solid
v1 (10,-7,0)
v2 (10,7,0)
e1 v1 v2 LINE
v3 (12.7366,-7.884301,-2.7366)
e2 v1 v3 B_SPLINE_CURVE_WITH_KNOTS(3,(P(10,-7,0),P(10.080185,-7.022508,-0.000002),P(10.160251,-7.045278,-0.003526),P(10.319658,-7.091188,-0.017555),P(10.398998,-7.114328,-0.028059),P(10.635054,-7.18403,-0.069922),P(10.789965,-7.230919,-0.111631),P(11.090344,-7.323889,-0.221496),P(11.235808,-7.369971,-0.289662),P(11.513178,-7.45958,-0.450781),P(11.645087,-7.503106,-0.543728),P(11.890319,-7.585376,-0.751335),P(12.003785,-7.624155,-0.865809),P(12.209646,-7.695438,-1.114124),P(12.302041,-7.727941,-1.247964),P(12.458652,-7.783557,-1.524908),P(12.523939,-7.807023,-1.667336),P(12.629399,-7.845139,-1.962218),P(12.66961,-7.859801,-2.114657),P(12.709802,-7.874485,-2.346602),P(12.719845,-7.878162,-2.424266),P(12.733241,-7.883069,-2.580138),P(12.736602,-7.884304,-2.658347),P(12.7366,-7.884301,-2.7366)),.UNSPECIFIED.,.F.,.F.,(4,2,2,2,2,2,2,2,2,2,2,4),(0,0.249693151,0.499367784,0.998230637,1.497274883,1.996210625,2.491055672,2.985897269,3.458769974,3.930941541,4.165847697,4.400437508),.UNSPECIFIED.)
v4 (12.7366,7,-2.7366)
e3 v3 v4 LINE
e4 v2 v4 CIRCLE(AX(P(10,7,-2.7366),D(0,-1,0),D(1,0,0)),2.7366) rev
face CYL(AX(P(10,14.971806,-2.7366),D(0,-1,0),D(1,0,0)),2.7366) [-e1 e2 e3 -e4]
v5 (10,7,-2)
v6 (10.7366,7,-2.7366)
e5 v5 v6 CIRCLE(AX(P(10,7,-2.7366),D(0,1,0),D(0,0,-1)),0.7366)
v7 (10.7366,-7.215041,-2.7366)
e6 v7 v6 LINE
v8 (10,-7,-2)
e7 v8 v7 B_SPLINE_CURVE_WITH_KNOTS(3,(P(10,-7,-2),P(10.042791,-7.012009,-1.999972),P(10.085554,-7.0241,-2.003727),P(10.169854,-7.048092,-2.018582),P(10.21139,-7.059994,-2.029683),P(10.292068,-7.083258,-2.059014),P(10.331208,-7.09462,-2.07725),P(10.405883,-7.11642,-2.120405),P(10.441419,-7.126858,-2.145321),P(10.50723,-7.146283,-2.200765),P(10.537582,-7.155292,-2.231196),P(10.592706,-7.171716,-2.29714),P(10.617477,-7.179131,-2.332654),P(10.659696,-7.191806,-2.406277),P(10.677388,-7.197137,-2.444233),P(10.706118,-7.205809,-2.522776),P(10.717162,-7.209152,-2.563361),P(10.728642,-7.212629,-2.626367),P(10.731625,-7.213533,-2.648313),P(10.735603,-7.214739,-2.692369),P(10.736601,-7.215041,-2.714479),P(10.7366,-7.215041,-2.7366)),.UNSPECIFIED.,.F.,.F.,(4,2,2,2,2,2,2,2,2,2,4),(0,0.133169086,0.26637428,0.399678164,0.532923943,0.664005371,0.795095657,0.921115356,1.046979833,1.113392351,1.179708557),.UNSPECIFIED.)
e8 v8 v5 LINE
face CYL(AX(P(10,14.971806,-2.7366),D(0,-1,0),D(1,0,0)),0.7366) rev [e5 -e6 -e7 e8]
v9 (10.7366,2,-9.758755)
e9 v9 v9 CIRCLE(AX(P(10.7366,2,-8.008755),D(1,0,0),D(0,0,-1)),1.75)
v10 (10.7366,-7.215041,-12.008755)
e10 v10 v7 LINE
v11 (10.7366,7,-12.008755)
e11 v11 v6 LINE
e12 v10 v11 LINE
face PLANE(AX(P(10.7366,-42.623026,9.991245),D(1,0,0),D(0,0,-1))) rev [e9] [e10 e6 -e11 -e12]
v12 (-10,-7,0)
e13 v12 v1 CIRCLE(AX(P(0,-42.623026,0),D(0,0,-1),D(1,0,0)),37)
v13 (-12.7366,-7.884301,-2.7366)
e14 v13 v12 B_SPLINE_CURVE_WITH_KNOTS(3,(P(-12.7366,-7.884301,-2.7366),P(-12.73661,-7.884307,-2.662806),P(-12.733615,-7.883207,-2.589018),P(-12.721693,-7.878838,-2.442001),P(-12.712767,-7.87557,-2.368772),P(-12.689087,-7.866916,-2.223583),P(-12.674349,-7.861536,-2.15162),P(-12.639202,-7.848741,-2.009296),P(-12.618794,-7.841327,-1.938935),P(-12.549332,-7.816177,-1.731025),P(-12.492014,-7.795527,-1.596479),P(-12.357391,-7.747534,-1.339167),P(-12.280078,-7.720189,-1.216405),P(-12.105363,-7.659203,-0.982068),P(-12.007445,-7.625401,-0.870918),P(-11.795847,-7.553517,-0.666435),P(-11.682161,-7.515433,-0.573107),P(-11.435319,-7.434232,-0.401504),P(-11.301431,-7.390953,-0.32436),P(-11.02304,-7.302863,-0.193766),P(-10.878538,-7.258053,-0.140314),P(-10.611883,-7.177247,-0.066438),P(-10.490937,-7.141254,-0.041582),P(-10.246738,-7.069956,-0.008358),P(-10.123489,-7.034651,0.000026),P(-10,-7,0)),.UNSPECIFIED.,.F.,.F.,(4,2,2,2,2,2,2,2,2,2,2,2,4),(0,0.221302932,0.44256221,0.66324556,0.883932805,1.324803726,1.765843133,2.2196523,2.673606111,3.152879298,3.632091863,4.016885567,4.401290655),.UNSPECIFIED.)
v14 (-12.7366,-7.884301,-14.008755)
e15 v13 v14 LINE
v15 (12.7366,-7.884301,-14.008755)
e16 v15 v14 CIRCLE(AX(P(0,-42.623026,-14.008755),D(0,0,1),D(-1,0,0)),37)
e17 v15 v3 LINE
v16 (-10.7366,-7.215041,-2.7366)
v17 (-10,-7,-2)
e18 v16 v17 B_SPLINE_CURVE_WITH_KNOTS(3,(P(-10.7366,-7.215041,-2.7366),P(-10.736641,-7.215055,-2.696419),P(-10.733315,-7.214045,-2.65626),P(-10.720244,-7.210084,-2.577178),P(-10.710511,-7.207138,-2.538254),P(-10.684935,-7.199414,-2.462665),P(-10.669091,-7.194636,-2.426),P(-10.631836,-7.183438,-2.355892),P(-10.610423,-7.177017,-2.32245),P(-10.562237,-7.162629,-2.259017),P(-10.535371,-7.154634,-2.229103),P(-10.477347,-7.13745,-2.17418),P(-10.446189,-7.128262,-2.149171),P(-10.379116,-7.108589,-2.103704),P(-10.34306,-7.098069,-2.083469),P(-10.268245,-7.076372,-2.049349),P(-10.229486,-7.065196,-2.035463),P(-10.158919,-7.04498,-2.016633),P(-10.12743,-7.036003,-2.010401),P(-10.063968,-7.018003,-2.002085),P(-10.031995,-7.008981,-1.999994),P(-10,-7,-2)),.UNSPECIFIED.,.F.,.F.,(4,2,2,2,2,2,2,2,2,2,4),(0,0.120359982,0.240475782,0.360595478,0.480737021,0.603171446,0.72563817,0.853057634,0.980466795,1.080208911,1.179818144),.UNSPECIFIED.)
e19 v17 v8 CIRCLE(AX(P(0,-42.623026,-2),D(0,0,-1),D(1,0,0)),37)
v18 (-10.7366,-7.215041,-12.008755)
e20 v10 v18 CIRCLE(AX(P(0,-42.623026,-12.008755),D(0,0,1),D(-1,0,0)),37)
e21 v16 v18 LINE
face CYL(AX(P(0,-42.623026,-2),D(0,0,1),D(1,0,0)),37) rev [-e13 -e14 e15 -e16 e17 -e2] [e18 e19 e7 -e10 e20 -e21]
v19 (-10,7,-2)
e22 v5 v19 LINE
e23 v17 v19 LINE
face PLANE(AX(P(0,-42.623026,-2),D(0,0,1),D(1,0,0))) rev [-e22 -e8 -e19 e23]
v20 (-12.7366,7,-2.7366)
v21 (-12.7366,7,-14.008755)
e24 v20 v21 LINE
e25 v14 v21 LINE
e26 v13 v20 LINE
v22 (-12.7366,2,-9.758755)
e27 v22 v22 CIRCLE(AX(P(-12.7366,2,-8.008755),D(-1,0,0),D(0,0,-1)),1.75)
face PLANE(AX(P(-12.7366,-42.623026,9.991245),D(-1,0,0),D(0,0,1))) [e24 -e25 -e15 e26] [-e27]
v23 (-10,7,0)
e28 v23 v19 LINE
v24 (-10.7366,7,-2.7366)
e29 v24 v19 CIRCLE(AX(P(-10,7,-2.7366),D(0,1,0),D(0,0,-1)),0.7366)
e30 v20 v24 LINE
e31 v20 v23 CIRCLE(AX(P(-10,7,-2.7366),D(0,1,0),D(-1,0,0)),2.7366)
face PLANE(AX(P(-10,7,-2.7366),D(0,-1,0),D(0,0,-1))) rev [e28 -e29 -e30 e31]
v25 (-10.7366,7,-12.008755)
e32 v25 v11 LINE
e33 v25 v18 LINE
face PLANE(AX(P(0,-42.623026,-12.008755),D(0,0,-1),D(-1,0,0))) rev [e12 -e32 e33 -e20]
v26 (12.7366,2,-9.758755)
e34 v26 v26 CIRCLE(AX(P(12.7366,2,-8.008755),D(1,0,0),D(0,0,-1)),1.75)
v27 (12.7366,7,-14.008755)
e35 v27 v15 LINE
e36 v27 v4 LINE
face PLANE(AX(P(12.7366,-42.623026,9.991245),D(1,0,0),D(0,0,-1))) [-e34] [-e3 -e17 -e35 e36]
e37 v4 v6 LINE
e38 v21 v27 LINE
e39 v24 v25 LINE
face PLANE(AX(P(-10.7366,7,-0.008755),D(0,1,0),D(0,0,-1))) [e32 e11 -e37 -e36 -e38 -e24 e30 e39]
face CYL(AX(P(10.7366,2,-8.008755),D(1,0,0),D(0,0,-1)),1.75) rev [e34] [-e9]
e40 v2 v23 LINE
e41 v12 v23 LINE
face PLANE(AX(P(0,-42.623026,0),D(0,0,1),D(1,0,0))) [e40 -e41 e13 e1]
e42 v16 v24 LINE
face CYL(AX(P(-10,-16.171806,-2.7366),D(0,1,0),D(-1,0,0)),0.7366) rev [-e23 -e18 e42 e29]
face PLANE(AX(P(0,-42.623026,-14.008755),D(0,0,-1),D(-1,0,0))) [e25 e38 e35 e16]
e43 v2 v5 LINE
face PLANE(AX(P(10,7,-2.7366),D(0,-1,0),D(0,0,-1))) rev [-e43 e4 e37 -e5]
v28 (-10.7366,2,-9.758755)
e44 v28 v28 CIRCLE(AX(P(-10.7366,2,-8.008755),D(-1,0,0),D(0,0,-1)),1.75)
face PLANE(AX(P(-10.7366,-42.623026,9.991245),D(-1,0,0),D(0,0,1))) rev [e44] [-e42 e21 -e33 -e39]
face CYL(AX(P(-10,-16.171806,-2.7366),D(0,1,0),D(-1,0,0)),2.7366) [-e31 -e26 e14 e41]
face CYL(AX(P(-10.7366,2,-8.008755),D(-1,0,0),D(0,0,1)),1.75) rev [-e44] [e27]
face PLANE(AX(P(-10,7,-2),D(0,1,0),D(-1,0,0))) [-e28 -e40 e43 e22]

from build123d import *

# Parameters (mm, degrees)
SKETCH1_R                  = 1.75
BASE_FLANGE1_DEPTH         = 2
SKETCHED_START             = -8.2
SKETCHED_BEND1_DEPTH       = 15.2
SKETCHED_BEND1_2_DEPTH     = 8.4499999
SKETCHED_START_2           = 3.7500001
SKETCHED_BEND1_3_DEPTH     = 3.2499999
SKETCHED_START_3           = 0.2499999
SKETCHED_BEND1_4_DEPTH     = 3.5000002
SKETCHED_START_4           = -12.7366
SKETCHED_BEND1_5_OUTLINE_R = 1.75
SKETCHED_BEND1_5_DEPTH     = 25.4732
SKETCH7_R                  = 37
CUT_EXTRUDE1_DEPTH         = 20.330576261
BOSS_EXTRUDE1_DEPTH        = 2


with BuildPart() as part:
    # Base-Flange1: sheet metal written as solids
    # Sketch1 → Base-Flange1 (new body)
    with BuildSketch(Plane.XY):
        with BuildLine():
            Line((10, 7), (22, 7))
            Line((22, 7), (22, -8.2))
            Line((22, -8.2), (10, -8.2))
            Line((10, -8.2), (10, -7))
            ThreePointArc((10, -7), (0, -5.623026261), (-10, -7))
            Line((-10, -7), (-10, -8.2))
            Line((-10, -8.2), (-22, -8.2))
            Line((-22, -8.2), (-22, 7))
            Line((-22, 7), (-10, 7))
            Line((-10, 7), (10, 7))
        make_face()
        with Locations((18, 2)):
            Circle(SKETCH1_R, mode=Mode.SUBTRACT)
        with Locations(Location((-18, 2, 0), (0, 0, 180))):
            Circle(SKETCH1_R, mode=Mode.SUBTRACT)
    extrude(amount=-BASE_FLANGE1_DEPTH)

    # Sketched Bend1: read off the stored shape, not the designer's step
    # Sketched Bend1 outline → Sketched Bend1 (cut)
    with BuildSketch(Plane(origin=(0, 0, 0), x_dir=(1, 0, 0), z_dir=(0, 1, 0)).offset(SKETCHED_START)):
        with BuildLine():
            ThreePointArc((-10, 0), (-11.654267209, 0.556604688), (-12.635602398, 2))
            Line((-12.635602398, 2), (-22, 2))
            Line((-22, 2), (-22, 0))
            Line((-22, 0), (-10, 0))
        make_face()
        with BuildLine():
            Line((22, 2), (12.635602398, 2))
            ThreePointArc((12.635602398, 2), (11.654267209, 0.556604688), (10, 0))
            Line((10, 0), (22, 0))
            Line((22, 0), (22, 2))
        make_face()
    extrude(amount=SKETCHED_BEND1_DEPTH, mode=Mode.SUBTRACT)

    # Sketched Bend1 2 outline → Sketched Bend1 2 (add)
    with BuildSketch(Plane(origin=(0, 0, 0), x_dir=(1, 0, 0), z_dir=(0, 1, 0)).offset(SKETCHED_START)):
        with BuildLine():
            ThreePointArc((-10, 2), (-10.520854855, 2.215745145), (-10.7366, 2.7366))
            Line((-10.7366, 2.7366), (-10.7366, 12.008755099))
            Line((-10.7366, 12.008755099), (-12.7366, 12.008755099))
            Line((-12.7366, 12.008755099), (-12.7366, 2.7366))
            ThreePointArc((-12.7366, 2.7366), (-12.711233029, 2.364854094), (-12.635602398, 2))
            Line((-12.635602398, 2), (-10, 2))
        make_face()
        with BuildLine():
            ThreePointArc((10.7366, 2.7366), (10.520854855, 2.215745145), (10, 2))
            Line((10, 2), (12.635602398, 2))
            ThreePointArc((12.635602398, 2), (12.711233029, 2.364854094), (12.7366, 2.7366))
            Line((12.7366, 2.7366), (12.7366, 12.008755099))
            Line((12.7366, 12.008755099), (10.7366, 12.008755099))
            Line((10.7366, 12.008755099), (10.7366, 2.7366))
        make_face()
    extrude(amount=SKETCHED_BEND1_2_DEPTH)

    # Sketched Bend1 3 outline → Sketched Bend1 3 (add)
    with BuildSketch(Plane(origin=(0, 0, 0), x_dir=(1, 0, 0), z_dir=(0, 1, 0)).offset(SKETCHED_START_2)):
        with BuildLine():
            ThreePointArc((-10, 2), (-10.520854855, 2.215745145), (-10.7366, 2.7366))
            Line((-10.7366, 2.7366), (-10.7366, 12.008755099))
            Line((-10.7366, 12.008755099), (-12.7366, 12.008755099))
            Line((-12.7366, 12.008755099), (-12.7366, 2.7366))
            ThreePointArc((-12.7366, 2.7366), (-12.711233029, 2.364854094), (-12.635602398, 2))
            Line((-12.635602398, 2), (-10, 2))
        make_face()
        with BuildLine():
            ThreePointArc((10.7366, 2.7366), (10.520854855, 2.215745145), (10, 2))
            Line((10, 2), (12.635602398, 2))
            ThreePointArc((12.635602398, 2), (12.711233029, 2.364854094), (12.7366, 2.7366))
            Line((12.7366, 2.7366), (12.7366, 12.008755099))
            Line((12.7366, 12.008755099), (10.7366, 12.008755099))
            Line((10.7366, 12.008755099), (10.7366, 2.7366))
        make_face()
    extrude(amount=SKETCHED_BEND1_3_DEPTH)

    # Sketched Bend1 4 outline → Sketched Bend1 4 (add)
    with BuildSketch(Plane(origin=(0, 0, 0), x_dir=(1, 0, 0), z_dir=(0, 1, 0)).offset(SKETCHED_START_3)):
        with BuildLine():
            ThreePointArc((10.7366, 2.7366), (10.520854855, 2.215745145), (10, 2))
            Line((10, 2), (12.635602398, 2))
            ThreePointArc((12.635602398, 2), (12.711233029, 2.364854094), (12.7366, 2.7366))
            Line((12.7366, 2.7366), (12.7366, 12.008755099))
            Line((12.7366, 12.008755099), (10.7366, 12.008755099))
            Line((10.7366, 12.008755099), (10.7366, 2.7366))
        make_face()
        with BuildLine():
            ThreePointArc((-10, 2), (-10.520854855, 2.215745145), (-10.7366, 2.7366))
            Line((-10.7366, 2.7366), (-10.7366, 12.008755099))
            Line((-10.7366, 12.008755099), (-12.7366, 12.008755099))
            Line((-12.7366, 12.008755099), (-12.7366, 2.7366))
            ThreePointArc((-12.7366, 2.7366), (-12.711233029, 2.364854094), (-12.635602398, 2))
            Line((-12.635602398, 2), (-10, 2))
        make_face()
    extrude(amount=SKETCHED_BEND1_4_DEPTH)

    # Sketched Bend1 5 outline → Sketched Bend1 5 (cut)
    with BuildSketch(Plane.YZ.offset(SKETCHED_START_4)):
        with Locations((2, -8.008755099)):
            Circle(SKETCHED_BEND1_5_OUTLINE_R)
    extrude(amount=SKETCHED_BEND1_5_DEPTH, mode=Mode.SUBTRACT)

    # Sketch7 → Cut-Extrude1 (cut, through all)
    with BuildSketch(Plane.XY):
        with Locations((0, -42.623026261)):
            Circle(SKETCH7_R)
    extrude(amount=-CUT_EXTRUDE1_DEPTH, mode=Mode.SUBTRACT)

    # Sketch8 → Boss-Extrude1 (add)
    with BuildSketch(Plane(origin=(0, 0, -12.008755099), x_dir=(-1, 0, 0), z_dir=(0, 0, -1))):
        with BuildLine():
            Line((-12.7366, -7.884301177), (-12.7366, 7))
            Line((-12.7366, 7), (12.7366, 7))
            Line((12.7366, 7), (12.7366, -7.884301177))
            ThreePointArc((12.7366, -7.884301177), (0, -5.623026261), (-12.7366, -7.884301177))
        make_face()
    extrude(amount=BOSS_EXTRUDE1_DEPTH)


solid = part.part
